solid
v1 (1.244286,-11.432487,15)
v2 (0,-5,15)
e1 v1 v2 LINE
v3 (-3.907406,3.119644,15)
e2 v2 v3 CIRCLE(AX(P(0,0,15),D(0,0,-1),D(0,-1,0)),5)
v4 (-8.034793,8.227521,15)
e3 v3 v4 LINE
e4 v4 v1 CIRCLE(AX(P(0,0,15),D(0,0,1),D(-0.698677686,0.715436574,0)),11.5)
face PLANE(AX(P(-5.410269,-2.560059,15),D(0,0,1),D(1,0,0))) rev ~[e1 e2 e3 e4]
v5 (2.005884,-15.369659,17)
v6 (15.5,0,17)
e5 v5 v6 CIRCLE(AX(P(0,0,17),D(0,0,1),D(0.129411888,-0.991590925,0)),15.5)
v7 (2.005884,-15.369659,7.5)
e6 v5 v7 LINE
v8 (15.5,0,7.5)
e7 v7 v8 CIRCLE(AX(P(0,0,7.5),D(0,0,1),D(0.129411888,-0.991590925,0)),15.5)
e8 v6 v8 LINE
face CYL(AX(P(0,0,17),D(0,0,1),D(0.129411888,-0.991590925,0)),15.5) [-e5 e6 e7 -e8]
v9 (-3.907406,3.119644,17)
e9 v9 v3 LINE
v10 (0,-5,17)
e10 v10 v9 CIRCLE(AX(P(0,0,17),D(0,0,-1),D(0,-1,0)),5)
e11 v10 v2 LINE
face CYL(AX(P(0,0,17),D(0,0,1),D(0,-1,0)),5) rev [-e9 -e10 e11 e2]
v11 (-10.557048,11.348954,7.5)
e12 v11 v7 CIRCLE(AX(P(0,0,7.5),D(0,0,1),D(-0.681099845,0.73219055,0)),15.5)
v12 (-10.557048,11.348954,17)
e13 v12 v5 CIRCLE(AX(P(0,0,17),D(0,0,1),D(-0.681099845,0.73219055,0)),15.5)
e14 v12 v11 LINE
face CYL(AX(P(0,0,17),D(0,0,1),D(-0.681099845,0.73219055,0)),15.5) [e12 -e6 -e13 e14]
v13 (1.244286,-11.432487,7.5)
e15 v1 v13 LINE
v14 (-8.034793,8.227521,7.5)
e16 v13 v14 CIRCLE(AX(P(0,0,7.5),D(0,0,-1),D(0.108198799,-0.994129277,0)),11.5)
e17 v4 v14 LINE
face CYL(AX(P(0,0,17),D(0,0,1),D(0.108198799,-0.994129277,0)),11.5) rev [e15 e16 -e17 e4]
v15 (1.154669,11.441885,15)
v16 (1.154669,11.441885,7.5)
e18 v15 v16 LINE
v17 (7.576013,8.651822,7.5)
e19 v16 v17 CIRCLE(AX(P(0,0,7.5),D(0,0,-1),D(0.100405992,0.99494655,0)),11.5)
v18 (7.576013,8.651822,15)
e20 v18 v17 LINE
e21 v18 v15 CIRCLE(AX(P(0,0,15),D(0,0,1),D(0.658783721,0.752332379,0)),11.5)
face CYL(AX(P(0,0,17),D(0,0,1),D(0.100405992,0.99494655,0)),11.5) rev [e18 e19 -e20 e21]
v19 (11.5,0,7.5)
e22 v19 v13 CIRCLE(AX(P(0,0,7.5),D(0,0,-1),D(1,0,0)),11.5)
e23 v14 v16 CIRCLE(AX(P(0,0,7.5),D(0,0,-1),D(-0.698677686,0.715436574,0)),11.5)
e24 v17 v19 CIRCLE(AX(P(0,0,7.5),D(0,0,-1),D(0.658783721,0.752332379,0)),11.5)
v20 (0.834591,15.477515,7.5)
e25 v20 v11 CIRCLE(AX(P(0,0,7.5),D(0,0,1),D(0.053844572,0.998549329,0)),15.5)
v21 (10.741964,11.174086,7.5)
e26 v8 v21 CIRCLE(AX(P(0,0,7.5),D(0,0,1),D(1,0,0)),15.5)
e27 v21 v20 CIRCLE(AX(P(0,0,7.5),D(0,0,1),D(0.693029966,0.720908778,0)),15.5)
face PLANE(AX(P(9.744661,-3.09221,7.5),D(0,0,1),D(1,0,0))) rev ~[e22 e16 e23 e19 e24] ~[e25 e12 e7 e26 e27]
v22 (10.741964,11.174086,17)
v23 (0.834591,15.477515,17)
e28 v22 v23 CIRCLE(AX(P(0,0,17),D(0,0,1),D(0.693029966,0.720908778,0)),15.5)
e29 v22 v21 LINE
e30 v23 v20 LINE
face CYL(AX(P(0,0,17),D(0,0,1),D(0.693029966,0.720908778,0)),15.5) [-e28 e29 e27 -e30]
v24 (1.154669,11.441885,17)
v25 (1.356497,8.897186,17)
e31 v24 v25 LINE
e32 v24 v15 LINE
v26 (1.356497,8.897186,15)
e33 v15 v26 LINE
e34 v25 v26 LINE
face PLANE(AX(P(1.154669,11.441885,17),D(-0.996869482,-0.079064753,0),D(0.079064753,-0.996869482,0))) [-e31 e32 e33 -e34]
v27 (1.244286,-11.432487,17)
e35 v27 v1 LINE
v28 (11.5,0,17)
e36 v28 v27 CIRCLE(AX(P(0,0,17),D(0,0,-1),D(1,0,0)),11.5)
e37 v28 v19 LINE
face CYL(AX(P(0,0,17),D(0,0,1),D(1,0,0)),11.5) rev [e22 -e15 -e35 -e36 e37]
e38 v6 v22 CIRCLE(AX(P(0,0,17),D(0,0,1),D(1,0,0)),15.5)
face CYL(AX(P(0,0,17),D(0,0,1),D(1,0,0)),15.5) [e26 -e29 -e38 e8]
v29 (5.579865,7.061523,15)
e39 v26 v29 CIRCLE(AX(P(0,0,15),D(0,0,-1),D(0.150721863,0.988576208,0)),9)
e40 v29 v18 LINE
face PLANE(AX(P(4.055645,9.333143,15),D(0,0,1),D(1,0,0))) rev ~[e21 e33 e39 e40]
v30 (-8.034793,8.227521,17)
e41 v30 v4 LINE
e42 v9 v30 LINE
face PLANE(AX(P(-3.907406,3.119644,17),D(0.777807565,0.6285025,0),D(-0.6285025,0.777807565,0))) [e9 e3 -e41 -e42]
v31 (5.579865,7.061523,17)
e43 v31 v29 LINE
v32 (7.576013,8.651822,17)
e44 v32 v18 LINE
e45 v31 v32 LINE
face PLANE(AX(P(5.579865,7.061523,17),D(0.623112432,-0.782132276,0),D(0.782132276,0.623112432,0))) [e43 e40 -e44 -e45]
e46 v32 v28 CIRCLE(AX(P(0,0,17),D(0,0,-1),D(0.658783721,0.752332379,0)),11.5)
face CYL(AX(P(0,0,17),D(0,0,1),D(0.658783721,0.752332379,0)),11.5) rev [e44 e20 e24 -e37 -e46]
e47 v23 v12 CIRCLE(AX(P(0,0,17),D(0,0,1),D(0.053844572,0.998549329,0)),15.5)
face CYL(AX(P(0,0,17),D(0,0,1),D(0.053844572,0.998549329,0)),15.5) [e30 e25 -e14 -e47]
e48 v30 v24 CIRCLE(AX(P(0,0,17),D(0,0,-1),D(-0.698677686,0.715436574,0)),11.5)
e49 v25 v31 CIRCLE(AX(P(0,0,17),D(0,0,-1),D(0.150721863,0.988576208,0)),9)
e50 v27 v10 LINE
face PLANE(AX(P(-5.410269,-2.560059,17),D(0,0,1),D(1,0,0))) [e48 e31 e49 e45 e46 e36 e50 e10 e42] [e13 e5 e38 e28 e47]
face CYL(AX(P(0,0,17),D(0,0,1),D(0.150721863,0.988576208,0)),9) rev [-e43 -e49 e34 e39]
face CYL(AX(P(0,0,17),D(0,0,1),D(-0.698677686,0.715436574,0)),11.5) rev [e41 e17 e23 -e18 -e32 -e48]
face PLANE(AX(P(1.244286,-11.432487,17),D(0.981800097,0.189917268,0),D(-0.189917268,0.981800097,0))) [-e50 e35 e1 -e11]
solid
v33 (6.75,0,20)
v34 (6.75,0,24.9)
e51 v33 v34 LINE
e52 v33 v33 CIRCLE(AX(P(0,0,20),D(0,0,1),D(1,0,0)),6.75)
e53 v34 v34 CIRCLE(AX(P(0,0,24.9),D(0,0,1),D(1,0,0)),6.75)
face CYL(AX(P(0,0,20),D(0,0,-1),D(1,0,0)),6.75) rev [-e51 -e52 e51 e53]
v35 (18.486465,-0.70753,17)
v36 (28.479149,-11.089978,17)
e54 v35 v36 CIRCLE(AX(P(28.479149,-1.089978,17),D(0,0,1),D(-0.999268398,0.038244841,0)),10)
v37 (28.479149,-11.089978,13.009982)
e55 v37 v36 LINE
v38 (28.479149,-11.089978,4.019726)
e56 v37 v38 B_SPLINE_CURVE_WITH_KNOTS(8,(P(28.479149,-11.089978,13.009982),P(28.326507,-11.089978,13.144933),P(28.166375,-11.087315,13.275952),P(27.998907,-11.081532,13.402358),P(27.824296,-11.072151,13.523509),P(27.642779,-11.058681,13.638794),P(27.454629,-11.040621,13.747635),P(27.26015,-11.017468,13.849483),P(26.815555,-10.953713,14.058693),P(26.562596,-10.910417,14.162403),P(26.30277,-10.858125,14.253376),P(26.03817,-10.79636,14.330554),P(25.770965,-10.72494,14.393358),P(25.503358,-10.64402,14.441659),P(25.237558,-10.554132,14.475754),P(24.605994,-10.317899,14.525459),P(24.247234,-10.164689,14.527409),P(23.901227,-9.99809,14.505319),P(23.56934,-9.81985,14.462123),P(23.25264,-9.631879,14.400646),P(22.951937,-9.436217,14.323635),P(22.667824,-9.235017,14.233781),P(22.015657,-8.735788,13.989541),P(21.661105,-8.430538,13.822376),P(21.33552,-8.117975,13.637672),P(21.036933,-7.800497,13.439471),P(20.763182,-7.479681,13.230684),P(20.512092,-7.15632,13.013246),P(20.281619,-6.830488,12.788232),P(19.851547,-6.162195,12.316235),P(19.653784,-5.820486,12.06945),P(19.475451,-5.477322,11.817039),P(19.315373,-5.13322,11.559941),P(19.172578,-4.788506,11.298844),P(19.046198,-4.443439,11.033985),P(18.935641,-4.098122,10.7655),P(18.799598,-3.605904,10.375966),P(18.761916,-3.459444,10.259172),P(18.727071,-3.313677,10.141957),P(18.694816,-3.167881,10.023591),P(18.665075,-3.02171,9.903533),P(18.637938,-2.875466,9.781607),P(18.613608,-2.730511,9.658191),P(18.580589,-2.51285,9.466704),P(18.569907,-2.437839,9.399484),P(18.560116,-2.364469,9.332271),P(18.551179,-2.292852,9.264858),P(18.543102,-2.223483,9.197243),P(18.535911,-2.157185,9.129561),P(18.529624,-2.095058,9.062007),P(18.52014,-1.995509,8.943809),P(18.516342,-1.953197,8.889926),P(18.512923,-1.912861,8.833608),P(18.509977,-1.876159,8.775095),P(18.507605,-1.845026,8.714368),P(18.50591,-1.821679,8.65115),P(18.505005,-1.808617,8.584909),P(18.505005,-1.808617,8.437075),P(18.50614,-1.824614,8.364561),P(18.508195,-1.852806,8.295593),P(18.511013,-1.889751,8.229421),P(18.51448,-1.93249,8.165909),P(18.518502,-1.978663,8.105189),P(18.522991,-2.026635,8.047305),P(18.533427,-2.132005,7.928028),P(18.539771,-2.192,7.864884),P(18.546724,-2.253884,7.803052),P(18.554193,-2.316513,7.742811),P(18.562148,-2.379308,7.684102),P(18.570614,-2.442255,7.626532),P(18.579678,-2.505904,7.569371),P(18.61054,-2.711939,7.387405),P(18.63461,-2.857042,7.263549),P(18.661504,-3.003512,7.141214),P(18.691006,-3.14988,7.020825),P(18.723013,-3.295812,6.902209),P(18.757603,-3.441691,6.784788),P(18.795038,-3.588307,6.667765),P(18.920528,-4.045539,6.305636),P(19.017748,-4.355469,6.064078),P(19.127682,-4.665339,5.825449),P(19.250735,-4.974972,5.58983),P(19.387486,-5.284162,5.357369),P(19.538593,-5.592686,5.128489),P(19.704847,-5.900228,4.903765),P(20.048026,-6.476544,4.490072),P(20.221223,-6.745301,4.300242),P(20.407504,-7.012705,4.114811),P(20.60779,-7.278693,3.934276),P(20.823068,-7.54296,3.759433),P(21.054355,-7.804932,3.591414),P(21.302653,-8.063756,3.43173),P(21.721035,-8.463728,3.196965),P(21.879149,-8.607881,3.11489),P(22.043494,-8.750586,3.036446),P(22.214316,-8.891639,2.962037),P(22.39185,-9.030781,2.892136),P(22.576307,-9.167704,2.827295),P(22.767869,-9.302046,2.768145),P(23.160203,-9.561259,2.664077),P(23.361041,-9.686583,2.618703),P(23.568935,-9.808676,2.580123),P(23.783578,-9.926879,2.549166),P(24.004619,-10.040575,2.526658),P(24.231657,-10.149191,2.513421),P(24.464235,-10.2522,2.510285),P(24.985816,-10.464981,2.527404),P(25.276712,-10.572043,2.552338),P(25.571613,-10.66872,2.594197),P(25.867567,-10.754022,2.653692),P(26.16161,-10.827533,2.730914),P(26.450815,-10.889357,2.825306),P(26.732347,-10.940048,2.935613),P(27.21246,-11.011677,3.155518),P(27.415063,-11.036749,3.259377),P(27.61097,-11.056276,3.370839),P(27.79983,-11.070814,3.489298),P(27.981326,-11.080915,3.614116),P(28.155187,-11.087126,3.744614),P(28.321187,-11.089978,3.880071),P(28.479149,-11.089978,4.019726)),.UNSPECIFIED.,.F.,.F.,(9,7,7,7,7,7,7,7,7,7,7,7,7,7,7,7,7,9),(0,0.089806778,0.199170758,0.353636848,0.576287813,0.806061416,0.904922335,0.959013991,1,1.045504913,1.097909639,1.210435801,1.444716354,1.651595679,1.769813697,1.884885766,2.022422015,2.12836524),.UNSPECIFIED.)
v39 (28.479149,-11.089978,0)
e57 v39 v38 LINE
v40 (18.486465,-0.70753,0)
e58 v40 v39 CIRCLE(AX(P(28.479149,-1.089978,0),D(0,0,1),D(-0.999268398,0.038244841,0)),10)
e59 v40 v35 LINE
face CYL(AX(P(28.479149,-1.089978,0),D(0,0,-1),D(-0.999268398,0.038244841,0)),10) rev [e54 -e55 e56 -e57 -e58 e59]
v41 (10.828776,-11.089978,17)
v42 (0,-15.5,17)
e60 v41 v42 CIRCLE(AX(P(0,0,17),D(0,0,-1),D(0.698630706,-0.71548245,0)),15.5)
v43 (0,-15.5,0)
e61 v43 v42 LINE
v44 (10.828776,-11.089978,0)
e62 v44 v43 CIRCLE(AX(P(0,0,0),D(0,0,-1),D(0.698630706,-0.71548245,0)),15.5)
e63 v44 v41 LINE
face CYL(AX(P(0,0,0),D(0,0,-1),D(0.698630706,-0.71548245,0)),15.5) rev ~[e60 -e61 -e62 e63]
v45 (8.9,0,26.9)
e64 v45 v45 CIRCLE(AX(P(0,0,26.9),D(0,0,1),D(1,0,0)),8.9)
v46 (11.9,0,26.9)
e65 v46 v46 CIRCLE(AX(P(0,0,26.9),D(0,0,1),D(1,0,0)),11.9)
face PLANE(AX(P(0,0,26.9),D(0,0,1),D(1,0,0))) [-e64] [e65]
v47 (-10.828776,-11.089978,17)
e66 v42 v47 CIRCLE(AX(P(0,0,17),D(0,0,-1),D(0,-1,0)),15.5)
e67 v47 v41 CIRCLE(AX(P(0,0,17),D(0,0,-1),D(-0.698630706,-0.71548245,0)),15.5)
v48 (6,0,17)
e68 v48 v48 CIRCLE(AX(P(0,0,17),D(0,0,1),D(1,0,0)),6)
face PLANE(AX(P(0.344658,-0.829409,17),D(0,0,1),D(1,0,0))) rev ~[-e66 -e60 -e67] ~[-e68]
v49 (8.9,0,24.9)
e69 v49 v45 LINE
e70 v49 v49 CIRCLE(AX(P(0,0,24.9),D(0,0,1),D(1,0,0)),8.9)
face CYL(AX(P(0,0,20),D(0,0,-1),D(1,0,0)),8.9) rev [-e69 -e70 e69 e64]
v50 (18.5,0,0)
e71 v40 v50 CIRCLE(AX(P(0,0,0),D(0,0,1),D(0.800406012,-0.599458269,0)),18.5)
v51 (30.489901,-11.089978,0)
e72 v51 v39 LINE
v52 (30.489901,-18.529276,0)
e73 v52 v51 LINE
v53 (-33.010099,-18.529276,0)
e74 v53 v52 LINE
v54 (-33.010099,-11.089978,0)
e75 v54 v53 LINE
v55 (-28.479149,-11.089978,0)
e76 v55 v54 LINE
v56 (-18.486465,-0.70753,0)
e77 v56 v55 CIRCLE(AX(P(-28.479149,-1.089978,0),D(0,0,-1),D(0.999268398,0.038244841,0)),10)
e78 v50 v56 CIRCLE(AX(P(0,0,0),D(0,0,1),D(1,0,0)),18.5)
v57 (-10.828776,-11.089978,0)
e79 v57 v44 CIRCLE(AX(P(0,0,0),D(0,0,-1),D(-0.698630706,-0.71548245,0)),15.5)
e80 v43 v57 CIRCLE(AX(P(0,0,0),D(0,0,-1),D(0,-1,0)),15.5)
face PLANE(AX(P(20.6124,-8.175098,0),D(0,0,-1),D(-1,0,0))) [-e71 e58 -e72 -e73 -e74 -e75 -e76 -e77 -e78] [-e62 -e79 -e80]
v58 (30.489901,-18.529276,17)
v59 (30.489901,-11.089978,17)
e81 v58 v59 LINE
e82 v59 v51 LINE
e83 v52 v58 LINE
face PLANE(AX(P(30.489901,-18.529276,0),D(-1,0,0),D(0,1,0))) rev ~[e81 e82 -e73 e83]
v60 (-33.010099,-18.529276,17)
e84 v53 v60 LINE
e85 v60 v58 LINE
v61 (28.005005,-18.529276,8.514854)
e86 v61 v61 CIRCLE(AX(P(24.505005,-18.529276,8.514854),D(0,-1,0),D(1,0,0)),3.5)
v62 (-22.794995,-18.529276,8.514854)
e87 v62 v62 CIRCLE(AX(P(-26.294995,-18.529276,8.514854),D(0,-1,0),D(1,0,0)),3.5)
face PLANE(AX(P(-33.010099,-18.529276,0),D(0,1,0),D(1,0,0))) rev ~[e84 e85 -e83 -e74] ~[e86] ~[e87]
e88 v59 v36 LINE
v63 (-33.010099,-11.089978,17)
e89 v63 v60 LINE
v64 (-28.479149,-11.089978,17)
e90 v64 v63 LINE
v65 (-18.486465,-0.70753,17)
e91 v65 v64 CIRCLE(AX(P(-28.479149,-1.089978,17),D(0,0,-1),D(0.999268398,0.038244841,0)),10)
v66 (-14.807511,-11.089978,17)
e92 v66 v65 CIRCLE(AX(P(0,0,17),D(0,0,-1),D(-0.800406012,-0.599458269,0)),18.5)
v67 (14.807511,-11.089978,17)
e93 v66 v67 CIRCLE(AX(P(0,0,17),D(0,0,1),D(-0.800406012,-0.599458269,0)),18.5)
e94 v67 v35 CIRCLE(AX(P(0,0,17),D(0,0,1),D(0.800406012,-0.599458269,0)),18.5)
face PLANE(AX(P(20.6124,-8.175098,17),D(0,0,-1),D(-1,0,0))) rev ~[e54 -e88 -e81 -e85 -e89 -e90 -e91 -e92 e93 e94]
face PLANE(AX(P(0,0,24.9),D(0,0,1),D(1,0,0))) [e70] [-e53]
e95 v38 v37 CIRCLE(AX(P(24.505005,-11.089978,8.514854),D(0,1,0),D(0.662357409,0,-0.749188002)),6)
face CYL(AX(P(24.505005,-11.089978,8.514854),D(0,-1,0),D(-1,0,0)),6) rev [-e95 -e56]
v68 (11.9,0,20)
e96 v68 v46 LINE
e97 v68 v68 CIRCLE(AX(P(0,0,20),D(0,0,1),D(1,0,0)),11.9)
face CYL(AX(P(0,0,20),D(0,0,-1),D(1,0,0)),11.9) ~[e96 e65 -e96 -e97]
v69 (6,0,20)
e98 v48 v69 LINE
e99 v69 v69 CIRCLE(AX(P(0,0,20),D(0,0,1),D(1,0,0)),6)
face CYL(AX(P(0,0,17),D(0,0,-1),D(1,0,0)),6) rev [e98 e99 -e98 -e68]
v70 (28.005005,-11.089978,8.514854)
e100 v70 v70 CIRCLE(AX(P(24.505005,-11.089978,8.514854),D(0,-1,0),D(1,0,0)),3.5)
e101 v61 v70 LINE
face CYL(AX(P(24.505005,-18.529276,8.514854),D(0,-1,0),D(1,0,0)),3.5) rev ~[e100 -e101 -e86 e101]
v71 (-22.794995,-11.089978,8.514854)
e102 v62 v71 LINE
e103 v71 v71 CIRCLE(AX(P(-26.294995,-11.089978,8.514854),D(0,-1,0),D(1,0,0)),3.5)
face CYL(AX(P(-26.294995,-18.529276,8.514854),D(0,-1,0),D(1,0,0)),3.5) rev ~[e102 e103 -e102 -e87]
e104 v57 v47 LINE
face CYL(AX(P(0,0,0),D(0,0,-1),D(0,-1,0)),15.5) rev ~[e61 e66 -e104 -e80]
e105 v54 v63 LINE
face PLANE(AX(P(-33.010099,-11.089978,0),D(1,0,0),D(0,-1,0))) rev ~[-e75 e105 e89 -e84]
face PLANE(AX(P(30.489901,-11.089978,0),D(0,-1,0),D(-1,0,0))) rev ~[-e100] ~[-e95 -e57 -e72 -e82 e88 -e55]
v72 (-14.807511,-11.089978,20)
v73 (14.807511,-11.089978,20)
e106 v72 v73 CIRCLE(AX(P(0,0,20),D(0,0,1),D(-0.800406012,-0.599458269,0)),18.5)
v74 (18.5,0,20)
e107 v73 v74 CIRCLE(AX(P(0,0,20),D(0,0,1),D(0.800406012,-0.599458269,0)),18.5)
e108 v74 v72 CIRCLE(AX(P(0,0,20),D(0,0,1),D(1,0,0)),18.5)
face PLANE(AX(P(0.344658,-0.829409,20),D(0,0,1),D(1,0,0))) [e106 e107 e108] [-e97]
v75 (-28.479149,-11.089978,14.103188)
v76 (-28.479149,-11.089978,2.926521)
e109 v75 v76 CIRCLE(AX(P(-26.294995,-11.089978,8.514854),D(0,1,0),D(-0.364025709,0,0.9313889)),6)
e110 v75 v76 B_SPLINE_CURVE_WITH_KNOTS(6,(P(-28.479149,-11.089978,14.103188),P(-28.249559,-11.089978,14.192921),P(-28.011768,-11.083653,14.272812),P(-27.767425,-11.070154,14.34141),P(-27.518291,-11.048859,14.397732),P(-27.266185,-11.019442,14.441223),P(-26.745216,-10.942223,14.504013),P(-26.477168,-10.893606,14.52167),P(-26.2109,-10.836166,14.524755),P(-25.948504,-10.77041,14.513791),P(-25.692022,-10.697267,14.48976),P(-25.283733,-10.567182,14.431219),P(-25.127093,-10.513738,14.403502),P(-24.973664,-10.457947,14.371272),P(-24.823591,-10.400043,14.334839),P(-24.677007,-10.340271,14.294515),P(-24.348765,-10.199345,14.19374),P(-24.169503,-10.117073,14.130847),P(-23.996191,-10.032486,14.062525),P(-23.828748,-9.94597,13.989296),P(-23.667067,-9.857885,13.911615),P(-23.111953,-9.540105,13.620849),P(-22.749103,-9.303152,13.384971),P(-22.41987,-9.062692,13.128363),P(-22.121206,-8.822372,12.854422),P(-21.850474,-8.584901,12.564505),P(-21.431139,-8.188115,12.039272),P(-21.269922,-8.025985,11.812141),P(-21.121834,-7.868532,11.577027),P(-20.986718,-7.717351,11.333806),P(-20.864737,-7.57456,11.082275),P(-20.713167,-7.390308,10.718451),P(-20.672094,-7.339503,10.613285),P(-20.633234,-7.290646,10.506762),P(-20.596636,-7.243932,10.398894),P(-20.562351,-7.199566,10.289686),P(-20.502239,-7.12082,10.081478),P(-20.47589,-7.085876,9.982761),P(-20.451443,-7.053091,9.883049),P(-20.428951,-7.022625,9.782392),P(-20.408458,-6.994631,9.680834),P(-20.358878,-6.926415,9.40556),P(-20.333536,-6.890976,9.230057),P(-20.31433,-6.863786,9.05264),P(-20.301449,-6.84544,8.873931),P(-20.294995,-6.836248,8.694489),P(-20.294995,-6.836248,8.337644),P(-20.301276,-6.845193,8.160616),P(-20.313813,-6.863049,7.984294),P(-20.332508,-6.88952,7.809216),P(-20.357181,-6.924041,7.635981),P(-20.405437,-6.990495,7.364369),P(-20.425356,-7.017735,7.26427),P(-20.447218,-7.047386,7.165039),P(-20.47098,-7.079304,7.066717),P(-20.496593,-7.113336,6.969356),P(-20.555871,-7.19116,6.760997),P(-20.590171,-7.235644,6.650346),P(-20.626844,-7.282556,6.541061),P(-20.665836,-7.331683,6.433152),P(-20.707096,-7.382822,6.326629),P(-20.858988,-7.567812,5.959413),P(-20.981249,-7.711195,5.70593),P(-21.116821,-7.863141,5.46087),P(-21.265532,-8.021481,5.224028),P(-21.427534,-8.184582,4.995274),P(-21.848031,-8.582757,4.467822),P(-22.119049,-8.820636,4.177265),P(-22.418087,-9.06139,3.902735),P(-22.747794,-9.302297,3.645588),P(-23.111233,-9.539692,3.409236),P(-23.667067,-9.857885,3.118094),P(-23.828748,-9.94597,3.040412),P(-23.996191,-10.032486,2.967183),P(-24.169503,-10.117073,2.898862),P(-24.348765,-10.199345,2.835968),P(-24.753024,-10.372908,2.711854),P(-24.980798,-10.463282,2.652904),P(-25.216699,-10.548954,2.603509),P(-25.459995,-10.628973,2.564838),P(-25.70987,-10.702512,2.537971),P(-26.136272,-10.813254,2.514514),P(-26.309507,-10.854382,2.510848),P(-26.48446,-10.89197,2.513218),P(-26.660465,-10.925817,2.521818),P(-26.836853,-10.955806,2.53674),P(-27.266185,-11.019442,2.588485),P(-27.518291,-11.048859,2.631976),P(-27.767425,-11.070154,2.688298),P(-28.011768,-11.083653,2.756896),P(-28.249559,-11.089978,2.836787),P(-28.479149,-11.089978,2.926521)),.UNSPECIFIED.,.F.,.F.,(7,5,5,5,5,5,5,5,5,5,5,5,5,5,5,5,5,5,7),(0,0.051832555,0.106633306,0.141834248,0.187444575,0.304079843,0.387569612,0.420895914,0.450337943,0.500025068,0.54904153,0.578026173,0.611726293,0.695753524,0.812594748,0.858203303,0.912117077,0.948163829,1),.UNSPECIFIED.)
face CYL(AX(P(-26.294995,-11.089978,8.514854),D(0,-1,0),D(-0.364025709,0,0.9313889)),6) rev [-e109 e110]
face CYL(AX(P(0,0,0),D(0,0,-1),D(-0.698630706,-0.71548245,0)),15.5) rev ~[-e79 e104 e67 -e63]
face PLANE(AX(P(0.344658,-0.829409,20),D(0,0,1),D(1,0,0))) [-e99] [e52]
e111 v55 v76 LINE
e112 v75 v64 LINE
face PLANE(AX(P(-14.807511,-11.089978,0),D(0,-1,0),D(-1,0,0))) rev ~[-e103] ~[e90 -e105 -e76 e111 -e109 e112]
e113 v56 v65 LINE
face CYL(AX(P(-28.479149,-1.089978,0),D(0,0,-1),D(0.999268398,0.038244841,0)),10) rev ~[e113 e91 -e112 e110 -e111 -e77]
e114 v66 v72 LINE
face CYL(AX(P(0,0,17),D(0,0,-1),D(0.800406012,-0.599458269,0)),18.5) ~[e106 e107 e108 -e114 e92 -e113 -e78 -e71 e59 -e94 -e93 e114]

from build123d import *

# Parameters (mm, degrees)
F1_DEPTH    = 17
F3_DEPTH    = 9.5
F4_DEPTH    = 2
F5_R        = 15.5
F5_R_2      = 6
F6_DEPTH    = 3
F7_R        = 11.9
F7_R_2      = 8.9
F8_DEPTH    = 6.9
F9_T1_DEPTH = 17
F10_R       = 3.5
F11_DEPTH   = 37.0302756021
F13_DEPTH   = 29.5909779782
F14_R       = 6
F15_DEPTH   = 29.5909779782
F7_R_3      = 6.75
F16_DEPTH   = 4.9


# Not quite as in the source:
# - a fillet or chamfer that OpenCascade refuses, or shapes differently, is made with other operations: its cross-section is extruded or revolved along the edge and cut away or added
# - a feature names something its author has since deleted; it is built from what else it names


with BuildPart() as f1:
    # F0 (on Top) → F1 (new body)
    with BuildSketch(Plane.XY):
        with BuildLine():
            ThreePointArc((0, -15.5), (-5.8461671777, -14.3552195849), (-10.8287759439, -11.0899779782))
            Line((-10.8287759439, -11.0899779782), (-14.8075112171, -11.0899779782))
            ThreePointArc((-14.8075112171, -11.0899779782), (-12.6472106411, -13.5017799938), (-10.0995049384, -15.5))
            Line((-10.0995049384, -15.5), (0, -15.5))
        make_face()
        with BuildLine():
            Line((14.8075112171, -11.0899779782), (10.8287759439, -11.0899779782))
            ThreePointArc((10.8287759439, -11.0899779782), (5.8461671777, -14.3552195849), (0, -15.5))
            Line((0, -15.5), (10.0995049384, -15.5))
            ThreePointArc((10.0995049384, -15.5), (12.6472106411, -13.5017799938), (14.8075112171, -11.0899779782))
        make_face()
        with BuildLine():
            ThreePointArc((-10.8287759439, -11.0899779782), (-6.0168086586, 14.2845375692), (15.5, 0))
            ThreePointArc((15.5, 0), (14.2845375692, -6.0168086586), (10.8287759439, -11.0899779782))
            Line((10.8287759439, -11.0899779782), (14.8075112171, -11.0899779782))
            ThreePointArc((14.8075112171, -11.0899779782), (17.5526202818, -5.8442725161), (18.5, 0))
            ThreePointArc((18.5, 0), (-5.8442725161, 17.5526202818), (-14.8075112171, -11.0899779782))
            Line((-14.8075112171, -11.0899779782), (-10.8287759439, -11.0899779782))
        make_face()
        with BuildLine():
            Line((30.4899009168, -15.5), (10.0995049384, -15.5))
            ThreePointArc((10.0995049384, -15.5), (0, -18.5), (-10.0995049384, -15.5))
            Line((-10.0995049384, -15.5), (-33.0100990832, -15.5))
            Line((-33.0100990832, -15.5), (-33.0100990832, -18.5292756021))
            Line((-33.0100990832, -18.5292756021), (30.4899009168, -18.5292756021))
            Line((30.4899009168, -18.5292756021), (30.4899009168, -15.5))
        make_face()
        with BuildLine():
            Line((30.4899009168, -11.0899779782), (14.8075112171, -11.0899779782))
            ThreePointArc((14.8075112171, -11.0899779782), (12.6472106411, -13.5017799938), (10.0995049384, -15.5))
            Line((10.0995049384, -15.5), (30.4899009168, -15.5))
            Line((30.4899009168, -15.5), (30.4899009168, -11.0899779782))
        make_face()
        with BuildLine():
            ThreePointArc((-10.0995049384, -15.5), (-12.6472106411, -13.5017799938), (-14.8075112171, -11.0899779782))
            Line((-14.8075112171, -11.0899779782), (-33.0100990832, -11.0899779782))
            Line((-33.0100990832, -11.0899779782), (-33.0100990832, -15.5))
            Line((-33.0100990832, -15.5), (-10.0995049384, -15.5))
        make_face()
        with BuildLine():
            Line((10.0995049384, -15.5), (0, -15.5))
            Line((0, -15.5), (-10.0995049384, -15.5))
            ThreePointArc((-10.0995049384, -15.5), (0, -18.5), (10.0995049384, -15.5))
        make_face()
    extrude(amount=F1_DEPTH)

    # F5 (on face) → F6 (join)
    with BuildSketch(Plane.XY.offset(17)):
        with BuildLine():
            ThreePointArc((14.8075112171, -11.0899779782), (17.5526202818, -5.8442725161), (18.5, 0))
            ThreePointArc((18.5, 0), (-5.8442725161, 17.5526202818), (-14.8075112171, -11.0899779782))
            ThreePointArc((-14.8075112171, -11.0899779782), (0, -18.5), (14.8075112171, -11.0899779782))
        make_face()
        Circle(F5_R, mode=Mode.SUBTRACT)
        Circle(F5_R)
        Circle(F5_R_2, mode=Mode.SUBTRACT)
    extrude(amount=F6_DEPTH)

    # F7 (on face) → F8 (join)
    with BuildSketch(Plane.XY.offset(20)):
        Circle(F7_R)
        Circle(F7_R_2, mode=Mode.SUBTRACT)
    extrude(amount=F8_DEPTH)

    # F9: fillet of radius 10 on 2 edges, made by hand

    # F9_s2 → F9_t1 (join)
    with BuildSketch(Plane.XY):
        with BuildLine():
            ThreePointArc((18.486465371, -0.7075295648), (21.2741342918, -8.0245116996), (28.4791493554, -11.0899779782))
            Line((28.4791493554, -11.0899779782), (14.8075112171, -11.0899779782))
            ThreePointArc((14.8075112171, -11.0899779782), (17.4376325236, -6.1789134946), (18.486465371, -0.7075295648))
        make_face()
        with BuildLine():
            ThreePointArc((-18.486465371, -0.7075295648), (-21.2741342918, -8.0245116996), (-28.4791493554, -11.0899779782))
            Line((-28.4791493554, -11.0899779782), (-14.8075112171, -11.0899779782))
            ThreePointArc((-14.8075112171, -11.0899779782), (-17.4376325236, -6.1789134946), (-18.486465371, -0.7075295648))
        make_face()
    extrude(amount=F9_T1_DEPTH)

    # F10 (on face) → F11 (cut, through all)
    with BuildSketch(Plane.XZ.offset(18.5292756021)):
        with Locations((-26.2949950993, 8.5148541257)):
            Circle(F10_R)
        with Locations((24.5050049007, 8.5148541257)):
            Circle(F10_R)
    extrude(amount=-F11_DEPTH, mode=Mode.SUBTRACT)

    # F12 (on face) → F13 (cut, through all)
    with BuildSketch(Plane(origin=(0, -11.0899779782, 0), x_dir=(-1, 0, 0), z_dir=(0, 1, 0))):
        with BuildLine():
            Line((28.4791493554, 11.2497161305), (28.4791493554, 14.1031875253))
            ThreePointArc((28.4791493554, 14.1031875253), (20.2949950993, 8.5148541257), (28.4791493554, 2.926520726))
            Line((28.4791493554, 2.926520726), (28.4791493554, 5.7799921208))
            ThreePointArc((28.4791493554, 5.7799921208), (29.7949950993, 8.5148541257), (28.4791493554, 11.2497161305))
        make_face()
        with BuildLine():
            ThreePointArc((28.4791493554, 2.926520726), (31.2500392735, 5.1314331894), (32.2949950993, 8.5148541257))
            ThreePointArc((32.2949950993, 8.5148541257), (31.2500392735, 11.8982750619), (28.4791493554, 14.1031875253))
            Line((28.4791493554, 14.1031875253), (28.4791493554, 11.2497161305))
            ThreePointArc((28.4791493554, 11.2497161305), (29.7949950993, 8.5148541257), (28.4791493554, 5.7799921208))
            Line((28.4791493554, 5.7799921208), (28.4791493554, 2.926520726))
        make_face()
    extrude(amount=F13_DEPTH, mode=Mode.SUBTRACT)

    # F14 (on face) → F15 (cut, through all)
    with BuildSketch(Plane(origin=(0, -11.0899779782, 0), x_dir=(-1, 0, 0), z_dir=(0, 1, 0))):
        with Locations((-24.5050049007, 8.5148541257)):
            Circle(F14_R)
    extrude(amount=F15_DEPTH, mode=Mode.SUBTRACT)

    # F7 (on face) → F16 (join)
    with BuildSketch(Plane.XY.offset(20)):
        Circle(F7_R_2)
        Circle(F7_R_3, mode=Mode.SUBTRACT)
    extrude(amount=F16_DEPTH)


with BuildPart() as f3:
    # F2 (on face) → F3 (new body)
    with BuildSketch(Plane.XY.offset(17)):
        with BuildLine():
            Line((10.7419644717, 11.1740860605), (7.5760127927, 8.651822361))
            ThreePointArc((7.5760127927, 8.651822361), (10.473159674, 4.7500448884), (11.5, 0))
            ThreePointArc((11.5, 0), (8.5603531215, -7.6792157435), (1.2442861853, -11.4324866888))
            Line((1.2442861853, -11.4324866888), (2.0058842699, -15.3696593422))
            ThreePointArc((2.0058842699, -15.3696593422), (11.6477724519, -10.2264068425), (15.5, 0))
            ThreePointArc((15.5, 0), (14.2609685735, 6.0724604029), (10.7419644717, 11.1740860605))
        make_face()
        with BuildLine():
            Line((0.8345908665, 15.4775145965), (1.1546689089, 11.4418853215))
            ThreePointArc((1.1546689089, 11.4418853215), (4.5828281197, 10.5474018803), (7.5760127927, 8.651822361))
            Line((7.5760127927, 8.651822361), (10.7419644717, 11.1740860605))
            ThreePointArc((10.7419644717, 11.1740860605), (6.1752759182, 14.2167495348), (0.8345908665, 15.4775145965))
        make_face()
        with BuildLine():
            ThreePointArc((-8.0347933894, 8.2275205979), (-3.7969808217, 10.855088053), (1.1546689089, 11.4418853215))
            Line((1.1546689089, 11.4418853215), (0.8345908665, 15.4775145965))
            ThreePointArc((0.8345908665, 15.4775145965), (-5.2813630167, 14.5724810752), (-10.5570475908, 11.3489535274))
            Line((-10.5570475908, 11.3489535274), (-8.0347933894, 8.2275205979))
        make_face()
        with BuildLine():
            ThreePointArc((1.2442861853, -11.4324866888), (-10.3998422416, -4.9084907405), (-8.0347933894, 8.2275205979))
            Line((-8.0347933894, 8.2275205979), (-10.5570475908, 11.3489535274))
            ThreePointArc((-10.5570475908, 11.3489535274), (-14.0268195595, -6.5953266065), (2.0058842699, -15.3696593422))
            Line((2.0058842699, -15.3696593422), (1.2442861853, -11.4324866888))
        make_face()
    extrude(amount=-F3_DEPTH)

    # F2 (on face) → F4 (join)
    with BuildSketch(Plane.XY.offset(17)):
        with BuildLine():
            Line((-3.9074059307, 3.119644033), (-8.0347933894, 8.2275205979))
            ThreePointArc((-8.0347933894, 8.2275205979), (-10.3998422416, -4.9084907405), (1.2442861853, -11.4324866888))
            Line((1.2442861853, -11.4324866888), (0, -5))
            ThreePointArc((0, -5), (-4.5054533715, -2.1681535733), (-3.9074059307, 3.119644033))
        make_face()
        with BuildLine():
            Line((1.1546689089, 11.4418853215), (1.3564967681, 8.8971858763))
            ThreePointArc((1.3564967681, 8.8971858763), (3.5875748475, 8.2540478987), (5.5798650145, 7.0615229533))
            Line((5.5798650145, 7.0615229533), (7.5760127927, 8.651822361))
            ThreePointArc((7.5760127927, 8.651822361), (4.5828281197, 10.5474018803), (1.1546689089, 11.4418853215))
        make_face()
    extrude(amount=-F4_DEPTH)


solid = Compound([f1.part, f3.part])
